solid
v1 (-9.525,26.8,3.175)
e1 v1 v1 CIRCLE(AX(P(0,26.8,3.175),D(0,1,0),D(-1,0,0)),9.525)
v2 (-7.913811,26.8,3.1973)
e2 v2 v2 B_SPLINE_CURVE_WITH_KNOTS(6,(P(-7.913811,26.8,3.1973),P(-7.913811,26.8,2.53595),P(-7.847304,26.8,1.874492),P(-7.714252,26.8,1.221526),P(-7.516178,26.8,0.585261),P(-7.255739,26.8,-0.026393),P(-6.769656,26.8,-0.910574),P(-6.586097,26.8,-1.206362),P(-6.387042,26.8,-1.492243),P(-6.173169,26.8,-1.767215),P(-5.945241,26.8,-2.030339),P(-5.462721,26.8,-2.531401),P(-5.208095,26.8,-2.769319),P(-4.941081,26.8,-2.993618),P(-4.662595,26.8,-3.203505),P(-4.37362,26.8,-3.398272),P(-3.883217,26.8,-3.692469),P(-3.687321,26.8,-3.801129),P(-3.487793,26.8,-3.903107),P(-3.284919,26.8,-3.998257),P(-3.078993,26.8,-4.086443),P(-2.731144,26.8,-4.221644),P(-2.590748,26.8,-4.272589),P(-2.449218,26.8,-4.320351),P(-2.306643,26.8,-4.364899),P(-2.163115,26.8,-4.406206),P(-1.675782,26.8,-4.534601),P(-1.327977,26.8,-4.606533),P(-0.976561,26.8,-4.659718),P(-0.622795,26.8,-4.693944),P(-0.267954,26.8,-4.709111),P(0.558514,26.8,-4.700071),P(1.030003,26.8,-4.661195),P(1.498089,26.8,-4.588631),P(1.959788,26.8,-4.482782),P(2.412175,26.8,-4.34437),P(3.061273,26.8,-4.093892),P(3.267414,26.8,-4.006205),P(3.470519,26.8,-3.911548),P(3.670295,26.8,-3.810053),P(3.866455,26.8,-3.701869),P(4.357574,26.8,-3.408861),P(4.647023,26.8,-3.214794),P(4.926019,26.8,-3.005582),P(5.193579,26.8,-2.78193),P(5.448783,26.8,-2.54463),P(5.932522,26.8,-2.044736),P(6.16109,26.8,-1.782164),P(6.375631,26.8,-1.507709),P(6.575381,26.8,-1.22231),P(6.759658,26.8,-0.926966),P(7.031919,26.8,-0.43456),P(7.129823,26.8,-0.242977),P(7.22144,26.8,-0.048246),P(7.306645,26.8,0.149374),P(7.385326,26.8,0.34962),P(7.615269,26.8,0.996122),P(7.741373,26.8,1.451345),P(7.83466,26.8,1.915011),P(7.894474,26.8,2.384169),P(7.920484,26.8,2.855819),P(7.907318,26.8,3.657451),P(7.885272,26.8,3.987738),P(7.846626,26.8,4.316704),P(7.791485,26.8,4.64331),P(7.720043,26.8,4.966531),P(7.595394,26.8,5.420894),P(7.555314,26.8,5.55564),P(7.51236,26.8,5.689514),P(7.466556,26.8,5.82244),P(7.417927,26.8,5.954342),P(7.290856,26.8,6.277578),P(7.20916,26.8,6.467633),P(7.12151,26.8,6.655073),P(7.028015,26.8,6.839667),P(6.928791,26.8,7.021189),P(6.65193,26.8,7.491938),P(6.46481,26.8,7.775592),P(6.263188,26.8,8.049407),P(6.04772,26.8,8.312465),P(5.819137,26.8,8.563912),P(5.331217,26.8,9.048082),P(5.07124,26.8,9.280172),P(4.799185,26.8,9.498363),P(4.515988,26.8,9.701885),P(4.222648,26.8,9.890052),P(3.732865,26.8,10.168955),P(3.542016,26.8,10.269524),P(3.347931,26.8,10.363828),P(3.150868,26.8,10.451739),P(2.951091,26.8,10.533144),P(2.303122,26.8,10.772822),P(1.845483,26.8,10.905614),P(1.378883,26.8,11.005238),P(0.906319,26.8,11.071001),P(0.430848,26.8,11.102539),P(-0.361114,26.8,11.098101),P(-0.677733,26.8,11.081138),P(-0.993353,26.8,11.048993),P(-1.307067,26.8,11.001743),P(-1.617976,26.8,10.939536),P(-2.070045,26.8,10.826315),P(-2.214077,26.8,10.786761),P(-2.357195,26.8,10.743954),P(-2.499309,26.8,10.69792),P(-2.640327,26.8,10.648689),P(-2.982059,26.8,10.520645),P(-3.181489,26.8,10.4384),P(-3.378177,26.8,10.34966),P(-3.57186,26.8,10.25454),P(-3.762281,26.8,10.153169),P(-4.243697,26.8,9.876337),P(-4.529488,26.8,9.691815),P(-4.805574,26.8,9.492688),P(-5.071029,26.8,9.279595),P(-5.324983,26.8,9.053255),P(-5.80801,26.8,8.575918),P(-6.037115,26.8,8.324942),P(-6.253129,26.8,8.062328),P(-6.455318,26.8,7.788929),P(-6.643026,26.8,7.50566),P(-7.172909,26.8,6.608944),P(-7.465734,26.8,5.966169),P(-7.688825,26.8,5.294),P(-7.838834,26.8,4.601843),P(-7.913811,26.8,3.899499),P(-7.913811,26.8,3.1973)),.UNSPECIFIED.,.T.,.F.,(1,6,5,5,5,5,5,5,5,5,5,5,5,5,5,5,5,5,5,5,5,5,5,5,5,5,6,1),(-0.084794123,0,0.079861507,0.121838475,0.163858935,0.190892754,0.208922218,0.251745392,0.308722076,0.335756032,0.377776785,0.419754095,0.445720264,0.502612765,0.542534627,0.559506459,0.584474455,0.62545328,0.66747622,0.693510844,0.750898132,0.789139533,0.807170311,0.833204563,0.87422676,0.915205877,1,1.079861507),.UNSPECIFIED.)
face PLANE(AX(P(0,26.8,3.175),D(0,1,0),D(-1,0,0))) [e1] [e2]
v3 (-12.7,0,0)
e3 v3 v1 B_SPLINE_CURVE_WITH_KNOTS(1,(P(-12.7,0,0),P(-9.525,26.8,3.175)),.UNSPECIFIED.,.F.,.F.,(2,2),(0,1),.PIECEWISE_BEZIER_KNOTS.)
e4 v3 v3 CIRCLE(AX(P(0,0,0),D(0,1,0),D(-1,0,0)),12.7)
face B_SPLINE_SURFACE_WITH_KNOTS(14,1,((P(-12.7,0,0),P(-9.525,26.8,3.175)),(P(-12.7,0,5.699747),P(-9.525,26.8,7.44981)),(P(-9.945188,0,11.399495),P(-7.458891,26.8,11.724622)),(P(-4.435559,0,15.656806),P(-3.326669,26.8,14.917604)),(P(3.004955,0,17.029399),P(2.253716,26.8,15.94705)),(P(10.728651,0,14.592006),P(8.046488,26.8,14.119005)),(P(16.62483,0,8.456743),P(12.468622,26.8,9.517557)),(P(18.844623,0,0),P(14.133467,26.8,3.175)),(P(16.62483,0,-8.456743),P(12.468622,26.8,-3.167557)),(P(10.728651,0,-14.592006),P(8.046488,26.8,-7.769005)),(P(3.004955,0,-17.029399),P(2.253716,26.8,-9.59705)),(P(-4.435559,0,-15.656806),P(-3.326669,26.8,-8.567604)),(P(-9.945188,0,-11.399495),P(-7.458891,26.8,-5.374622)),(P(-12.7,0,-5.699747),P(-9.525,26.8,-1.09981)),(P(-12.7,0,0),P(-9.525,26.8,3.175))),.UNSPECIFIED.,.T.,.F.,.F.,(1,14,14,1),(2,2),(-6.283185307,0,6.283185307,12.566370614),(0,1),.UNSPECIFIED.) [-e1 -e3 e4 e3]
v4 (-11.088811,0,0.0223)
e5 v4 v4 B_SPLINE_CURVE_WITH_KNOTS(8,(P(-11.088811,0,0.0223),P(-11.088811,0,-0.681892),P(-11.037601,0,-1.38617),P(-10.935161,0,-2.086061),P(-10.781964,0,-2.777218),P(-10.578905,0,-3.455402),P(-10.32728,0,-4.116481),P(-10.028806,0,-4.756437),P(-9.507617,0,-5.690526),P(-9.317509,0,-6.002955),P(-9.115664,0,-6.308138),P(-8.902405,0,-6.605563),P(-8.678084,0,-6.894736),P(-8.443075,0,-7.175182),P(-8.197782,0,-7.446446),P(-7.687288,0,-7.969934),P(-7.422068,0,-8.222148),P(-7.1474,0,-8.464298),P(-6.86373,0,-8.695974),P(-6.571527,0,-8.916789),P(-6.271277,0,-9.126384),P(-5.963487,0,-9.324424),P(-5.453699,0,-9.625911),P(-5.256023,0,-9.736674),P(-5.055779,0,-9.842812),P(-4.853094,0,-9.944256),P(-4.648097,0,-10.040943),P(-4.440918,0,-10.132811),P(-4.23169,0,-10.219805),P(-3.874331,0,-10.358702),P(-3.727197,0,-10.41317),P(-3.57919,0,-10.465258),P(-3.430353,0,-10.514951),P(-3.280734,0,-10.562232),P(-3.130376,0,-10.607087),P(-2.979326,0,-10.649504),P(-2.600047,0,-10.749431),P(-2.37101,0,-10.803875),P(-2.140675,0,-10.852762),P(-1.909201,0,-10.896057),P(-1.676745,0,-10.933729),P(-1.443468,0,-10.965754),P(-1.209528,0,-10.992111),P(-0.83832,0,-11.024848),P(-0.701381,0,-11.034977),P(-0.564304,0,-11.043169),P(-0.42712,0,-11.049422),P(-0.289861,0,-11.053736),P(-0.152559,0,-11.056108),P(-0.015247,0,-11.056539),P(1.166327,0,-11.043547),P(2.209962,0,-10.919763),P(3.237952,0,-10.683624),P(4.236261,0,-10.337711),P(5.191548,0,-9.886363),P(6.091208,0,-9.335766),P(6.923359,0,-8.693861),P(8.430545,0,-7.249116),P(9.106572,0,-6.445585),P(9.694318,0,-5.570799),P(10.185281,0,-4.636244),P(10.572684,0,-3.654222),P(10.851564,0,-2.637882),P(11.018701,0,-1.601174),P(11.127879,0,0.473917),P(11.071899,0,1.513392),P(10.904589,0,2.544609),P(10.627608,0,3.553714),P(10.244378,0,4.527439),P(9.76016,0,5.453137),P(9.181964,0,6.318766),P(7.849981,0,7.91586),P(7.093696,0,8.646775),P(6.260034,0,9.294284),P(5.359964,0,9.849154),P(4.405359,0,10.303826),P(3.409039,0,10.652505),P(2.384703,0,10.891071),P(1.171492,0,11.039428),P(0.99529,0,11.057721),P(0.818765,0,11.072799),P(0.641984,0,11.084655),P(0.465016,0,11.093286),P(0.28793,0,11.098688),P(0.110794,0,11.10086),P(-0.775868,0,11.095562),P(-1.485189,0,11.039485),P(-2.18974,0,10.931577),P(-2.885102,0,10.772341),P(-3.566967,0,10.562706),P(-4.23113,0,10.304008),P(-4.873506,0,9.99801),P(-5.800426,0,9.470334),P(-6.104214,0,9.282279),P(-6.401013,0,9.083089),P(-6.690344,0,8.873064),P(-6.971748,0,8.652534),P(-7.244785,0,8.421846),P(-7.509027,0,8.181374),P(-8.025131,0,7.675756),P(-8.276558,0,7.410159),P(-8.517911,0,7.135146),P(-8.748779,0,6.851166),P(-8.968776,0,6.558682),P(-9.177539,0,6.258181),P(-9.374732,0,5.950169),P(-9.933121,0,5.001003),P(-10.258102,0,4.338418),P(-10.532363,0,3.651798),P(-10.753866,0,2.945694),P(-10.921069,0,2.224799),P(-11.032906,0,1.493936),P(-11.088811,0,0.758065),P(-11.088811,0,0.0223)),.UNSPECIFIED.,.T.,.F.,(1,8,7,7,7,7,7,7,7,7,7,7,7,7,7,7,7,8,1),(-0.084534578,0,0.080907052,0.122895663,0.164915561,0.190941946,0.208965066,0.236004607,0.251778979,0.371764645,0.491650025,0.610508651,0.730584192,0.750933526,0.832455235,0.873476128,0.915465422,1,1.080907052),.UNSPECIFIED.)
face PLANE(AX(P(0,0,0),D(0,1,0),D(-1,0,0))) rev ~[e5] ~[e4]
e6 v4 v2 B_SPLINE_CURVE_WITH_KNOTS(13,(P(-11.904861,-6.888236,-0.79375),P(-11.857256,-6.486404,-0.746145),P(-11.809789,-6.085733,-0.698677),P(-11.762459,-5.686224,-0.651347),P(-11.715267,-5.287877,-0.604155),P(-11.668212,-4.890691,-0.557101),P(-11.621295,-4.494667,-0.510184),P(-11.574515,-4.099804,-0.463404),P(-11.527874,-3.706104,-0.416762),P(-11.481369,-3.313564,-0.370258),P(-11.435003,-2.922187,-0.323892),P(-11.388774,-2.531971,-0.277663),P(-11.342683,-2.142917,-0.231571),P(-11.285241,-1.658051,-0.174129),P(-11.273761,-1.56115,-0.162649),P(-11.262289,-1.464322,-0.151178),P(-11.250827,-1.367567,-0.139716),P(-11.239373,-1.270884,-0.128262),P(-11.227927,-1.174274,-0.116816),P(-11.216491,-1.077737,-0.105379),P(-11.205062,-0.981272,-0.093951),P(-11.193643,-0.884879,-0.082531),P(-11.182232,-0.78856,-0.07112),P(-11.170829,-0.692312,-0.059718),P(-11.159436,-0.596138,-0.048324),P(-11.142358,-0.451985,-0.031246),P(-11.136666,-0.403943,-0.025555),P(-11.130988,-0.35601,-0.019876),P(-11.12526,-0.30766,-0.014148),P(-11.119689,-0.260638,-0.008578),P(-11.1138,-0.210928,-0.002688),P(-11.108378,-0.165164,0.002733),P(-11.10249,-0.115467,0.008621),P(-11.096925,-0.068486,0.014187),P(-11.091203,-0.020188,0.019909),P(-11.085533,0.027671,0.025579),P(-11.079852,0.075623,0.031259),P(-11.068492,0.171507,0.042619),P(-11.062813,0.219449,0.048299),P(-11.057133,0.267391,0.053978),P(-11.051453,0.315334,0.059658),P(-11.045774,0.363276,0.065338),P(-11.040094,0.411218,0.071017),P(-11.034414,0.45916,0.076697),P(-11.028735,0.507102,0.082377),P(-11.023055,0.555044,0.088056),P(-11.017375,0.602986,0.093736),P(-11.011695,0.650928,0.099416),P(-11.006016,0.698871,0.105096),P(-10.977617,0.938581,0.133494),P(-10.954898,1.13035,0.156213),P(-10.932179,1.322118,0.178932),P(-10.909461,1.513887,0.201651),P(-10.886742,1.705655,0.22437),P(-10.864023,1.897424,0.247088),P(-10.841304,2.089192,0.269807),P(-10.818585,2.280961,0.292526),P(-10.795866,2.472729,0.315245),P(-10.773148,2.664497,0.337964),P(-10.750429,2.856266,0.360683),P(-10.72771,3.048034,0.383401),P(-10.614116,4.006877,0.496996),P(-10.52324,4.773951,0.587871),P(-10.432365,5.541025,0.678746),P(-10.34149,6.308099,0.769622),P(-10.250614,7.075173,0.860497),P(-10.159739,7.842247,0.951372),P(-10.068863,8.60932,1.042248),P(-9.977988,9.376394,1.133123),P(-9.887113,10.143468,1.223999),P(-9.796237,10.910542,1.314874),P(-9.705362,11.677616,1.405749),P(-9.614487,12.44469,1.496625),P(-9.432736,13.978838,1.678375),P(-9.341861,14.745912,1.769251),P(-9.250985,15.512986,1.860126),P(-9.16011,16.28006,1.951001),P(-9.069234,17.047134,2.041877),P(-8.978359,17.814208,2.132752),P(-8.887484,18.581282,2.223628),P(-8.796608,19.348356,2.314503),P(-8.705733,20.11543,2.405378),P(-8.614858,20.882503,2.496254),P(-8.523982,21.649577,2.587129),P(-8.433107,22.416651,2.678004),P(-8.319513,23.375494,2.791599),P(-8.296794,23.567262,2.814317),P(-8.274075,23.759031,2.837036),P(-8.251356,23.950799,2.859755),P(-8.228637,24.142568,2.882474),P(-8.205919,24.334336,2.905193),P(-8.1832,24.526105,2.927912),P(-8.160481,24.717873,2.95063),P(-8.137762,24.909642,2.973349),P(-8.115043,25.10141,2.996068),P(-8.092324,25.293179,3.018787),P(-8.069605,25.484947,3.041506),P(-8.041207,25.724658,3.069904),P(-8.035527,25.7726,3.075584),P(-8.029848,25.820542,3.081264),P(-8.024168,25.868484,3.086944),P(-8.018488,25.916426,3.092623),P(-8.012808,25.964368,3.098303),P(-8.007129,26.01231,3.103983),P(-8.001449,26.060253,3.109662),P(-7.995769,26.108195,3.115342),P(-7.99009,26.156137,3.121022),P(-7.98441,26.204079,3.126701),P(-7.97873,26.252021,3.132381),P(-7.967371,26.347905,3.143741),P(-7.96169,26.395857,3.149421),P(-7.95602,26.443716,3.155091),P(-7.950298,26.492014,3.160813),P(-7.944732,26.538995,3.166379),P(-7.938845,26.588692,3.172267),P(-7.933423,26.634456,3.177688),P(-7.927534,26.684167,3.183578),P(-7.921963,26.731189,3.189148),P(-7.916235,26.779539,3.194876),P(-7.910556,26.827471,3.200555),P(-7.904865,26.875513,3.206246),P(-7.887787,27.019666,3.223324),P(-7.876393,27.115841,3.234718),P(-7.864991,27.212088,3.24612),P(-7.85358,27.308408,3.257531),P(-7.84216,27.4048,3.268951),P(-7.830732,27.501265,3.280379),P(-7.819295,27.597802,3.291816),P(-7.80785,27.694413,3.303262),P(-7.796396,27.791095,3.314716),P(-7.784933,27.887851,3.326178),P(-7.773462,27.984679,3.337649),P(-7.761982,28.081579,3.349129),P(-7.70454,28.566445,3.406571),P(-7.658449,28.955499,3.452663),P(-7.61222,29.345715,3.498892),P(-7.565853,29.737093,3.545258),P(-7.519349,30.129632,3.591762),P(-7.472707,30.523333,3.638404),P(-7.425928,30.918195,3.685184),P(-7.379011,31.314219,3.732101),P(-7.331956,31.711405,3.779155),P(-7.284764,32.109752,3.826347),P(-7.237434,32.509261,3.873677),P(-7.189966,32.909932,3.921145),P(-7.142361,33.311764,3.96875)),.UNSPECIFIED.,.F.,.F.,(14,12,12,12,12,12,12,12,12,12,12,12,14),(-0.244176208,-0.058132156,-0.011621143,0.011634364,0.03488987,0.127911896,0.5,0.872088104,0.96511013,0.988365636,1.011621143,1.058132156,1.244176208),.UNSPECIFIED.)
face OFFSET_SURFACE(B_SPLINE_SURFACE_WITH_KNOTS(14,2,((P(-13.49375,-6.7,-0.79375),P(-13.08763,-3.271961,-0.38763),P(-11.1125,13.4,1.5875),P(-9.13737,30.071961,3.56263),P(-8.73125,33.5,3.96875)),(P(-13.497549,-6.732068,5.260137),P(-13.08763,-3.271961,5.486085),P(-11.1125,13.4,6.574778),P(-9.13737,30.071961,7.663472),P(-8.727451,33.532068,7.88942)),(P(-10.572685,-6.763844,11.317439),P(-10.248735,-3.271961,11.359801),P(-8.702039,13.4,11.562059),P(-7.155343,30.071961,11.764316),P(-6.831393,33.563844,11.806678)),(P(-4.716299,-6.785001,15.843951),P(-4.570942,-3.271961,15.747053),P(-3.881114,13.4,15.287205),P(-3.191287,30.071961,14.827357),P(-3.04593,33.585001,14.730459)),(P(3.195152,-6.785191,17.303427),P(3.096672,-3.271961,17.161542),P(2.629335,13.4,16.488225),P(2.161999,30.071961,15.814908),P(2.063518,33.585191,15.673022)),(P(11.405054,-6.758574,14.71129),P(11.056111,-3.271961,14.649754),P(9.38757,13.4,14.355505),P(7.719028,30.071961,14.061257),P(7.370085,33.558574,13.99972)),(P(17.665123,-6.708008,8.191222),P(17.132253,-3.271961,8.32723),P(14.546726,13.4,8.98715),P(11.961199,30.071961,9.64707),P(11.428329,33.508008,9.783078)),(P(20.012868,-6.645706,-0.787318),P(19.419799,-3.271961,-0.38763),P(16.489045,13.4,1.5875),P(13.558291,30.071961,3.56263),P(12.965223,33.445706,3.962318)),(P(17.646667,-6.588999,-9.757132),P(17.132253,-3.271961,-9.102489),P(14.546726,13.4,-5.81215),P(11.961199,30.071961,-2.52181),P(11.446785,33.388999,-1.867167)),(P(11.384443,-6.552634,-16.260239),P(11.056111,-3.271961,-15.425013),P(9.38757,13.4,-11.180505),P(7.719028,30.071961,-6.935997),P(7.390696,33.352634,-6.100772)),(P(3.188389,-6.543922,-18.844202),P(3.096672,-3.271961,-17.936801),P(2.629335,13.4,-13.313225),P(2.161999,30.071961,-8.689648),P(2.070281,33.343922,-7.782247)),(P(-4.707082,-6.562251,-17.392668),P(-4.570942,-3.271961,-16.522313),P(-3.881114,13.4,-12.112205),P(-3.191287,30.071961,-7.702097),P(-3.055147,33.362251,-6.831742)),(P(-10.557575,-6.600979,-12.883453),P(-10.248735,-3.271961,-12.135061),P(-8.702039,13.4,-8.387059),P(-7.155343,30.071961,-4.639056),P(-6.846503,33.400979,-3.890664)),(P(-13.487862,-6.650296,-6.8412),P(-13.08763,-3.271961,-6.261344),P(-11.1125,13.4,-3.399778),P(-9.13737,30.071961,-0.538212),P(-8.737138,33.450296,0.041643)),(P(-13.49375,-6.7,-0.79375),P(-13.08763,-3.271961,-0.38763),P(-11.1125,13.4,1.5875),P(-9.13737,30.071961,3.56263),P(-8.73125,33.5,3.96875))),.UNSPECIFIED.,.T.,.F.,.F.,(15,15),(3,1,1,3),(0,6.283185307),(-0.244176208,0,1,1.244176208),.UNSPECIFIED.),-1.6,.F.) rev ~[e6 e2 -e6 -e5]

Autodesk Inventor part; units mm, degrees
ref_plane "YZ Plane" through (0, 0, 0) normal (1, 0, 0) x (0, 1, 0)
ref_plane "XY Plane" through (0, 0, 0) normal (0, 0, 1) x (1, 0, 0)
sketch "Szkic6" plane through (0, 0, 0) normal (0, 1, 0) x (-1, 0, 0)
  circle A0 centre (0, 0) radius 12.7
  dimension "d33" = 25.4
ref_plane "Płaszczyzna konstrukcyjna1" through (0, 26.8, 0) normal (0, 1, 0) x (-1, 0, 0)
sketch "Szkic7" plane through (0, 26.8, 0) normal (0, 1, 0) x (-1, 0, 0)
  circle A0 centre (0, 3.175) radius 9.525
  line L0 (0, -20.3) -> (0, 20.3) construction
  circle A1 centre (0, 0) radius 12.7 construction
  dimension "d35" = 19.05
loft "Wyciągnięcie złożone1" add profiles "Szkic6", "Szkic7"
shell "Skorupa1" thickness 1.6 removed faces 2 at (0.3827, 26.8, 7.8465) at (3.6254, 0, -0.9542)
equation "\"d33\" = OD1"
equation "\"d35\" = OD2"
equation "\"d52\" = THK"
equation "\"SzerokośćGięciaPodcięcia\" = Grubość"
equation "\"RozmiarPodcięciaNarożnika\" = 4 * Grubość"
equation "\"PromieńPrzejścia\" = PromieńGięcia"
equation "\"Rozmiar_promienia_Jacobiego\" = PromieńGięcia"
equation "\"Wielk_odstępu\" = Grubość"
equation "\"d2\" = PromieńGięcia"
equation "\"d23\" = PromieńGięcia"
equation "\"OD1\" = 25.4"
equation "\"OD2\" = 19.05"
equation "\"L\" = 26.8"
equation "\"THK\" = 1.6"
equation "\"d34\" = L"
equation "\"Grubość\" = 1.5"
equation "\"PromieńGięcia\" = 3"
properties part number "Redukcja asymetryczna Ø25,4x19,05x1,6 L=26,8" material "304"
